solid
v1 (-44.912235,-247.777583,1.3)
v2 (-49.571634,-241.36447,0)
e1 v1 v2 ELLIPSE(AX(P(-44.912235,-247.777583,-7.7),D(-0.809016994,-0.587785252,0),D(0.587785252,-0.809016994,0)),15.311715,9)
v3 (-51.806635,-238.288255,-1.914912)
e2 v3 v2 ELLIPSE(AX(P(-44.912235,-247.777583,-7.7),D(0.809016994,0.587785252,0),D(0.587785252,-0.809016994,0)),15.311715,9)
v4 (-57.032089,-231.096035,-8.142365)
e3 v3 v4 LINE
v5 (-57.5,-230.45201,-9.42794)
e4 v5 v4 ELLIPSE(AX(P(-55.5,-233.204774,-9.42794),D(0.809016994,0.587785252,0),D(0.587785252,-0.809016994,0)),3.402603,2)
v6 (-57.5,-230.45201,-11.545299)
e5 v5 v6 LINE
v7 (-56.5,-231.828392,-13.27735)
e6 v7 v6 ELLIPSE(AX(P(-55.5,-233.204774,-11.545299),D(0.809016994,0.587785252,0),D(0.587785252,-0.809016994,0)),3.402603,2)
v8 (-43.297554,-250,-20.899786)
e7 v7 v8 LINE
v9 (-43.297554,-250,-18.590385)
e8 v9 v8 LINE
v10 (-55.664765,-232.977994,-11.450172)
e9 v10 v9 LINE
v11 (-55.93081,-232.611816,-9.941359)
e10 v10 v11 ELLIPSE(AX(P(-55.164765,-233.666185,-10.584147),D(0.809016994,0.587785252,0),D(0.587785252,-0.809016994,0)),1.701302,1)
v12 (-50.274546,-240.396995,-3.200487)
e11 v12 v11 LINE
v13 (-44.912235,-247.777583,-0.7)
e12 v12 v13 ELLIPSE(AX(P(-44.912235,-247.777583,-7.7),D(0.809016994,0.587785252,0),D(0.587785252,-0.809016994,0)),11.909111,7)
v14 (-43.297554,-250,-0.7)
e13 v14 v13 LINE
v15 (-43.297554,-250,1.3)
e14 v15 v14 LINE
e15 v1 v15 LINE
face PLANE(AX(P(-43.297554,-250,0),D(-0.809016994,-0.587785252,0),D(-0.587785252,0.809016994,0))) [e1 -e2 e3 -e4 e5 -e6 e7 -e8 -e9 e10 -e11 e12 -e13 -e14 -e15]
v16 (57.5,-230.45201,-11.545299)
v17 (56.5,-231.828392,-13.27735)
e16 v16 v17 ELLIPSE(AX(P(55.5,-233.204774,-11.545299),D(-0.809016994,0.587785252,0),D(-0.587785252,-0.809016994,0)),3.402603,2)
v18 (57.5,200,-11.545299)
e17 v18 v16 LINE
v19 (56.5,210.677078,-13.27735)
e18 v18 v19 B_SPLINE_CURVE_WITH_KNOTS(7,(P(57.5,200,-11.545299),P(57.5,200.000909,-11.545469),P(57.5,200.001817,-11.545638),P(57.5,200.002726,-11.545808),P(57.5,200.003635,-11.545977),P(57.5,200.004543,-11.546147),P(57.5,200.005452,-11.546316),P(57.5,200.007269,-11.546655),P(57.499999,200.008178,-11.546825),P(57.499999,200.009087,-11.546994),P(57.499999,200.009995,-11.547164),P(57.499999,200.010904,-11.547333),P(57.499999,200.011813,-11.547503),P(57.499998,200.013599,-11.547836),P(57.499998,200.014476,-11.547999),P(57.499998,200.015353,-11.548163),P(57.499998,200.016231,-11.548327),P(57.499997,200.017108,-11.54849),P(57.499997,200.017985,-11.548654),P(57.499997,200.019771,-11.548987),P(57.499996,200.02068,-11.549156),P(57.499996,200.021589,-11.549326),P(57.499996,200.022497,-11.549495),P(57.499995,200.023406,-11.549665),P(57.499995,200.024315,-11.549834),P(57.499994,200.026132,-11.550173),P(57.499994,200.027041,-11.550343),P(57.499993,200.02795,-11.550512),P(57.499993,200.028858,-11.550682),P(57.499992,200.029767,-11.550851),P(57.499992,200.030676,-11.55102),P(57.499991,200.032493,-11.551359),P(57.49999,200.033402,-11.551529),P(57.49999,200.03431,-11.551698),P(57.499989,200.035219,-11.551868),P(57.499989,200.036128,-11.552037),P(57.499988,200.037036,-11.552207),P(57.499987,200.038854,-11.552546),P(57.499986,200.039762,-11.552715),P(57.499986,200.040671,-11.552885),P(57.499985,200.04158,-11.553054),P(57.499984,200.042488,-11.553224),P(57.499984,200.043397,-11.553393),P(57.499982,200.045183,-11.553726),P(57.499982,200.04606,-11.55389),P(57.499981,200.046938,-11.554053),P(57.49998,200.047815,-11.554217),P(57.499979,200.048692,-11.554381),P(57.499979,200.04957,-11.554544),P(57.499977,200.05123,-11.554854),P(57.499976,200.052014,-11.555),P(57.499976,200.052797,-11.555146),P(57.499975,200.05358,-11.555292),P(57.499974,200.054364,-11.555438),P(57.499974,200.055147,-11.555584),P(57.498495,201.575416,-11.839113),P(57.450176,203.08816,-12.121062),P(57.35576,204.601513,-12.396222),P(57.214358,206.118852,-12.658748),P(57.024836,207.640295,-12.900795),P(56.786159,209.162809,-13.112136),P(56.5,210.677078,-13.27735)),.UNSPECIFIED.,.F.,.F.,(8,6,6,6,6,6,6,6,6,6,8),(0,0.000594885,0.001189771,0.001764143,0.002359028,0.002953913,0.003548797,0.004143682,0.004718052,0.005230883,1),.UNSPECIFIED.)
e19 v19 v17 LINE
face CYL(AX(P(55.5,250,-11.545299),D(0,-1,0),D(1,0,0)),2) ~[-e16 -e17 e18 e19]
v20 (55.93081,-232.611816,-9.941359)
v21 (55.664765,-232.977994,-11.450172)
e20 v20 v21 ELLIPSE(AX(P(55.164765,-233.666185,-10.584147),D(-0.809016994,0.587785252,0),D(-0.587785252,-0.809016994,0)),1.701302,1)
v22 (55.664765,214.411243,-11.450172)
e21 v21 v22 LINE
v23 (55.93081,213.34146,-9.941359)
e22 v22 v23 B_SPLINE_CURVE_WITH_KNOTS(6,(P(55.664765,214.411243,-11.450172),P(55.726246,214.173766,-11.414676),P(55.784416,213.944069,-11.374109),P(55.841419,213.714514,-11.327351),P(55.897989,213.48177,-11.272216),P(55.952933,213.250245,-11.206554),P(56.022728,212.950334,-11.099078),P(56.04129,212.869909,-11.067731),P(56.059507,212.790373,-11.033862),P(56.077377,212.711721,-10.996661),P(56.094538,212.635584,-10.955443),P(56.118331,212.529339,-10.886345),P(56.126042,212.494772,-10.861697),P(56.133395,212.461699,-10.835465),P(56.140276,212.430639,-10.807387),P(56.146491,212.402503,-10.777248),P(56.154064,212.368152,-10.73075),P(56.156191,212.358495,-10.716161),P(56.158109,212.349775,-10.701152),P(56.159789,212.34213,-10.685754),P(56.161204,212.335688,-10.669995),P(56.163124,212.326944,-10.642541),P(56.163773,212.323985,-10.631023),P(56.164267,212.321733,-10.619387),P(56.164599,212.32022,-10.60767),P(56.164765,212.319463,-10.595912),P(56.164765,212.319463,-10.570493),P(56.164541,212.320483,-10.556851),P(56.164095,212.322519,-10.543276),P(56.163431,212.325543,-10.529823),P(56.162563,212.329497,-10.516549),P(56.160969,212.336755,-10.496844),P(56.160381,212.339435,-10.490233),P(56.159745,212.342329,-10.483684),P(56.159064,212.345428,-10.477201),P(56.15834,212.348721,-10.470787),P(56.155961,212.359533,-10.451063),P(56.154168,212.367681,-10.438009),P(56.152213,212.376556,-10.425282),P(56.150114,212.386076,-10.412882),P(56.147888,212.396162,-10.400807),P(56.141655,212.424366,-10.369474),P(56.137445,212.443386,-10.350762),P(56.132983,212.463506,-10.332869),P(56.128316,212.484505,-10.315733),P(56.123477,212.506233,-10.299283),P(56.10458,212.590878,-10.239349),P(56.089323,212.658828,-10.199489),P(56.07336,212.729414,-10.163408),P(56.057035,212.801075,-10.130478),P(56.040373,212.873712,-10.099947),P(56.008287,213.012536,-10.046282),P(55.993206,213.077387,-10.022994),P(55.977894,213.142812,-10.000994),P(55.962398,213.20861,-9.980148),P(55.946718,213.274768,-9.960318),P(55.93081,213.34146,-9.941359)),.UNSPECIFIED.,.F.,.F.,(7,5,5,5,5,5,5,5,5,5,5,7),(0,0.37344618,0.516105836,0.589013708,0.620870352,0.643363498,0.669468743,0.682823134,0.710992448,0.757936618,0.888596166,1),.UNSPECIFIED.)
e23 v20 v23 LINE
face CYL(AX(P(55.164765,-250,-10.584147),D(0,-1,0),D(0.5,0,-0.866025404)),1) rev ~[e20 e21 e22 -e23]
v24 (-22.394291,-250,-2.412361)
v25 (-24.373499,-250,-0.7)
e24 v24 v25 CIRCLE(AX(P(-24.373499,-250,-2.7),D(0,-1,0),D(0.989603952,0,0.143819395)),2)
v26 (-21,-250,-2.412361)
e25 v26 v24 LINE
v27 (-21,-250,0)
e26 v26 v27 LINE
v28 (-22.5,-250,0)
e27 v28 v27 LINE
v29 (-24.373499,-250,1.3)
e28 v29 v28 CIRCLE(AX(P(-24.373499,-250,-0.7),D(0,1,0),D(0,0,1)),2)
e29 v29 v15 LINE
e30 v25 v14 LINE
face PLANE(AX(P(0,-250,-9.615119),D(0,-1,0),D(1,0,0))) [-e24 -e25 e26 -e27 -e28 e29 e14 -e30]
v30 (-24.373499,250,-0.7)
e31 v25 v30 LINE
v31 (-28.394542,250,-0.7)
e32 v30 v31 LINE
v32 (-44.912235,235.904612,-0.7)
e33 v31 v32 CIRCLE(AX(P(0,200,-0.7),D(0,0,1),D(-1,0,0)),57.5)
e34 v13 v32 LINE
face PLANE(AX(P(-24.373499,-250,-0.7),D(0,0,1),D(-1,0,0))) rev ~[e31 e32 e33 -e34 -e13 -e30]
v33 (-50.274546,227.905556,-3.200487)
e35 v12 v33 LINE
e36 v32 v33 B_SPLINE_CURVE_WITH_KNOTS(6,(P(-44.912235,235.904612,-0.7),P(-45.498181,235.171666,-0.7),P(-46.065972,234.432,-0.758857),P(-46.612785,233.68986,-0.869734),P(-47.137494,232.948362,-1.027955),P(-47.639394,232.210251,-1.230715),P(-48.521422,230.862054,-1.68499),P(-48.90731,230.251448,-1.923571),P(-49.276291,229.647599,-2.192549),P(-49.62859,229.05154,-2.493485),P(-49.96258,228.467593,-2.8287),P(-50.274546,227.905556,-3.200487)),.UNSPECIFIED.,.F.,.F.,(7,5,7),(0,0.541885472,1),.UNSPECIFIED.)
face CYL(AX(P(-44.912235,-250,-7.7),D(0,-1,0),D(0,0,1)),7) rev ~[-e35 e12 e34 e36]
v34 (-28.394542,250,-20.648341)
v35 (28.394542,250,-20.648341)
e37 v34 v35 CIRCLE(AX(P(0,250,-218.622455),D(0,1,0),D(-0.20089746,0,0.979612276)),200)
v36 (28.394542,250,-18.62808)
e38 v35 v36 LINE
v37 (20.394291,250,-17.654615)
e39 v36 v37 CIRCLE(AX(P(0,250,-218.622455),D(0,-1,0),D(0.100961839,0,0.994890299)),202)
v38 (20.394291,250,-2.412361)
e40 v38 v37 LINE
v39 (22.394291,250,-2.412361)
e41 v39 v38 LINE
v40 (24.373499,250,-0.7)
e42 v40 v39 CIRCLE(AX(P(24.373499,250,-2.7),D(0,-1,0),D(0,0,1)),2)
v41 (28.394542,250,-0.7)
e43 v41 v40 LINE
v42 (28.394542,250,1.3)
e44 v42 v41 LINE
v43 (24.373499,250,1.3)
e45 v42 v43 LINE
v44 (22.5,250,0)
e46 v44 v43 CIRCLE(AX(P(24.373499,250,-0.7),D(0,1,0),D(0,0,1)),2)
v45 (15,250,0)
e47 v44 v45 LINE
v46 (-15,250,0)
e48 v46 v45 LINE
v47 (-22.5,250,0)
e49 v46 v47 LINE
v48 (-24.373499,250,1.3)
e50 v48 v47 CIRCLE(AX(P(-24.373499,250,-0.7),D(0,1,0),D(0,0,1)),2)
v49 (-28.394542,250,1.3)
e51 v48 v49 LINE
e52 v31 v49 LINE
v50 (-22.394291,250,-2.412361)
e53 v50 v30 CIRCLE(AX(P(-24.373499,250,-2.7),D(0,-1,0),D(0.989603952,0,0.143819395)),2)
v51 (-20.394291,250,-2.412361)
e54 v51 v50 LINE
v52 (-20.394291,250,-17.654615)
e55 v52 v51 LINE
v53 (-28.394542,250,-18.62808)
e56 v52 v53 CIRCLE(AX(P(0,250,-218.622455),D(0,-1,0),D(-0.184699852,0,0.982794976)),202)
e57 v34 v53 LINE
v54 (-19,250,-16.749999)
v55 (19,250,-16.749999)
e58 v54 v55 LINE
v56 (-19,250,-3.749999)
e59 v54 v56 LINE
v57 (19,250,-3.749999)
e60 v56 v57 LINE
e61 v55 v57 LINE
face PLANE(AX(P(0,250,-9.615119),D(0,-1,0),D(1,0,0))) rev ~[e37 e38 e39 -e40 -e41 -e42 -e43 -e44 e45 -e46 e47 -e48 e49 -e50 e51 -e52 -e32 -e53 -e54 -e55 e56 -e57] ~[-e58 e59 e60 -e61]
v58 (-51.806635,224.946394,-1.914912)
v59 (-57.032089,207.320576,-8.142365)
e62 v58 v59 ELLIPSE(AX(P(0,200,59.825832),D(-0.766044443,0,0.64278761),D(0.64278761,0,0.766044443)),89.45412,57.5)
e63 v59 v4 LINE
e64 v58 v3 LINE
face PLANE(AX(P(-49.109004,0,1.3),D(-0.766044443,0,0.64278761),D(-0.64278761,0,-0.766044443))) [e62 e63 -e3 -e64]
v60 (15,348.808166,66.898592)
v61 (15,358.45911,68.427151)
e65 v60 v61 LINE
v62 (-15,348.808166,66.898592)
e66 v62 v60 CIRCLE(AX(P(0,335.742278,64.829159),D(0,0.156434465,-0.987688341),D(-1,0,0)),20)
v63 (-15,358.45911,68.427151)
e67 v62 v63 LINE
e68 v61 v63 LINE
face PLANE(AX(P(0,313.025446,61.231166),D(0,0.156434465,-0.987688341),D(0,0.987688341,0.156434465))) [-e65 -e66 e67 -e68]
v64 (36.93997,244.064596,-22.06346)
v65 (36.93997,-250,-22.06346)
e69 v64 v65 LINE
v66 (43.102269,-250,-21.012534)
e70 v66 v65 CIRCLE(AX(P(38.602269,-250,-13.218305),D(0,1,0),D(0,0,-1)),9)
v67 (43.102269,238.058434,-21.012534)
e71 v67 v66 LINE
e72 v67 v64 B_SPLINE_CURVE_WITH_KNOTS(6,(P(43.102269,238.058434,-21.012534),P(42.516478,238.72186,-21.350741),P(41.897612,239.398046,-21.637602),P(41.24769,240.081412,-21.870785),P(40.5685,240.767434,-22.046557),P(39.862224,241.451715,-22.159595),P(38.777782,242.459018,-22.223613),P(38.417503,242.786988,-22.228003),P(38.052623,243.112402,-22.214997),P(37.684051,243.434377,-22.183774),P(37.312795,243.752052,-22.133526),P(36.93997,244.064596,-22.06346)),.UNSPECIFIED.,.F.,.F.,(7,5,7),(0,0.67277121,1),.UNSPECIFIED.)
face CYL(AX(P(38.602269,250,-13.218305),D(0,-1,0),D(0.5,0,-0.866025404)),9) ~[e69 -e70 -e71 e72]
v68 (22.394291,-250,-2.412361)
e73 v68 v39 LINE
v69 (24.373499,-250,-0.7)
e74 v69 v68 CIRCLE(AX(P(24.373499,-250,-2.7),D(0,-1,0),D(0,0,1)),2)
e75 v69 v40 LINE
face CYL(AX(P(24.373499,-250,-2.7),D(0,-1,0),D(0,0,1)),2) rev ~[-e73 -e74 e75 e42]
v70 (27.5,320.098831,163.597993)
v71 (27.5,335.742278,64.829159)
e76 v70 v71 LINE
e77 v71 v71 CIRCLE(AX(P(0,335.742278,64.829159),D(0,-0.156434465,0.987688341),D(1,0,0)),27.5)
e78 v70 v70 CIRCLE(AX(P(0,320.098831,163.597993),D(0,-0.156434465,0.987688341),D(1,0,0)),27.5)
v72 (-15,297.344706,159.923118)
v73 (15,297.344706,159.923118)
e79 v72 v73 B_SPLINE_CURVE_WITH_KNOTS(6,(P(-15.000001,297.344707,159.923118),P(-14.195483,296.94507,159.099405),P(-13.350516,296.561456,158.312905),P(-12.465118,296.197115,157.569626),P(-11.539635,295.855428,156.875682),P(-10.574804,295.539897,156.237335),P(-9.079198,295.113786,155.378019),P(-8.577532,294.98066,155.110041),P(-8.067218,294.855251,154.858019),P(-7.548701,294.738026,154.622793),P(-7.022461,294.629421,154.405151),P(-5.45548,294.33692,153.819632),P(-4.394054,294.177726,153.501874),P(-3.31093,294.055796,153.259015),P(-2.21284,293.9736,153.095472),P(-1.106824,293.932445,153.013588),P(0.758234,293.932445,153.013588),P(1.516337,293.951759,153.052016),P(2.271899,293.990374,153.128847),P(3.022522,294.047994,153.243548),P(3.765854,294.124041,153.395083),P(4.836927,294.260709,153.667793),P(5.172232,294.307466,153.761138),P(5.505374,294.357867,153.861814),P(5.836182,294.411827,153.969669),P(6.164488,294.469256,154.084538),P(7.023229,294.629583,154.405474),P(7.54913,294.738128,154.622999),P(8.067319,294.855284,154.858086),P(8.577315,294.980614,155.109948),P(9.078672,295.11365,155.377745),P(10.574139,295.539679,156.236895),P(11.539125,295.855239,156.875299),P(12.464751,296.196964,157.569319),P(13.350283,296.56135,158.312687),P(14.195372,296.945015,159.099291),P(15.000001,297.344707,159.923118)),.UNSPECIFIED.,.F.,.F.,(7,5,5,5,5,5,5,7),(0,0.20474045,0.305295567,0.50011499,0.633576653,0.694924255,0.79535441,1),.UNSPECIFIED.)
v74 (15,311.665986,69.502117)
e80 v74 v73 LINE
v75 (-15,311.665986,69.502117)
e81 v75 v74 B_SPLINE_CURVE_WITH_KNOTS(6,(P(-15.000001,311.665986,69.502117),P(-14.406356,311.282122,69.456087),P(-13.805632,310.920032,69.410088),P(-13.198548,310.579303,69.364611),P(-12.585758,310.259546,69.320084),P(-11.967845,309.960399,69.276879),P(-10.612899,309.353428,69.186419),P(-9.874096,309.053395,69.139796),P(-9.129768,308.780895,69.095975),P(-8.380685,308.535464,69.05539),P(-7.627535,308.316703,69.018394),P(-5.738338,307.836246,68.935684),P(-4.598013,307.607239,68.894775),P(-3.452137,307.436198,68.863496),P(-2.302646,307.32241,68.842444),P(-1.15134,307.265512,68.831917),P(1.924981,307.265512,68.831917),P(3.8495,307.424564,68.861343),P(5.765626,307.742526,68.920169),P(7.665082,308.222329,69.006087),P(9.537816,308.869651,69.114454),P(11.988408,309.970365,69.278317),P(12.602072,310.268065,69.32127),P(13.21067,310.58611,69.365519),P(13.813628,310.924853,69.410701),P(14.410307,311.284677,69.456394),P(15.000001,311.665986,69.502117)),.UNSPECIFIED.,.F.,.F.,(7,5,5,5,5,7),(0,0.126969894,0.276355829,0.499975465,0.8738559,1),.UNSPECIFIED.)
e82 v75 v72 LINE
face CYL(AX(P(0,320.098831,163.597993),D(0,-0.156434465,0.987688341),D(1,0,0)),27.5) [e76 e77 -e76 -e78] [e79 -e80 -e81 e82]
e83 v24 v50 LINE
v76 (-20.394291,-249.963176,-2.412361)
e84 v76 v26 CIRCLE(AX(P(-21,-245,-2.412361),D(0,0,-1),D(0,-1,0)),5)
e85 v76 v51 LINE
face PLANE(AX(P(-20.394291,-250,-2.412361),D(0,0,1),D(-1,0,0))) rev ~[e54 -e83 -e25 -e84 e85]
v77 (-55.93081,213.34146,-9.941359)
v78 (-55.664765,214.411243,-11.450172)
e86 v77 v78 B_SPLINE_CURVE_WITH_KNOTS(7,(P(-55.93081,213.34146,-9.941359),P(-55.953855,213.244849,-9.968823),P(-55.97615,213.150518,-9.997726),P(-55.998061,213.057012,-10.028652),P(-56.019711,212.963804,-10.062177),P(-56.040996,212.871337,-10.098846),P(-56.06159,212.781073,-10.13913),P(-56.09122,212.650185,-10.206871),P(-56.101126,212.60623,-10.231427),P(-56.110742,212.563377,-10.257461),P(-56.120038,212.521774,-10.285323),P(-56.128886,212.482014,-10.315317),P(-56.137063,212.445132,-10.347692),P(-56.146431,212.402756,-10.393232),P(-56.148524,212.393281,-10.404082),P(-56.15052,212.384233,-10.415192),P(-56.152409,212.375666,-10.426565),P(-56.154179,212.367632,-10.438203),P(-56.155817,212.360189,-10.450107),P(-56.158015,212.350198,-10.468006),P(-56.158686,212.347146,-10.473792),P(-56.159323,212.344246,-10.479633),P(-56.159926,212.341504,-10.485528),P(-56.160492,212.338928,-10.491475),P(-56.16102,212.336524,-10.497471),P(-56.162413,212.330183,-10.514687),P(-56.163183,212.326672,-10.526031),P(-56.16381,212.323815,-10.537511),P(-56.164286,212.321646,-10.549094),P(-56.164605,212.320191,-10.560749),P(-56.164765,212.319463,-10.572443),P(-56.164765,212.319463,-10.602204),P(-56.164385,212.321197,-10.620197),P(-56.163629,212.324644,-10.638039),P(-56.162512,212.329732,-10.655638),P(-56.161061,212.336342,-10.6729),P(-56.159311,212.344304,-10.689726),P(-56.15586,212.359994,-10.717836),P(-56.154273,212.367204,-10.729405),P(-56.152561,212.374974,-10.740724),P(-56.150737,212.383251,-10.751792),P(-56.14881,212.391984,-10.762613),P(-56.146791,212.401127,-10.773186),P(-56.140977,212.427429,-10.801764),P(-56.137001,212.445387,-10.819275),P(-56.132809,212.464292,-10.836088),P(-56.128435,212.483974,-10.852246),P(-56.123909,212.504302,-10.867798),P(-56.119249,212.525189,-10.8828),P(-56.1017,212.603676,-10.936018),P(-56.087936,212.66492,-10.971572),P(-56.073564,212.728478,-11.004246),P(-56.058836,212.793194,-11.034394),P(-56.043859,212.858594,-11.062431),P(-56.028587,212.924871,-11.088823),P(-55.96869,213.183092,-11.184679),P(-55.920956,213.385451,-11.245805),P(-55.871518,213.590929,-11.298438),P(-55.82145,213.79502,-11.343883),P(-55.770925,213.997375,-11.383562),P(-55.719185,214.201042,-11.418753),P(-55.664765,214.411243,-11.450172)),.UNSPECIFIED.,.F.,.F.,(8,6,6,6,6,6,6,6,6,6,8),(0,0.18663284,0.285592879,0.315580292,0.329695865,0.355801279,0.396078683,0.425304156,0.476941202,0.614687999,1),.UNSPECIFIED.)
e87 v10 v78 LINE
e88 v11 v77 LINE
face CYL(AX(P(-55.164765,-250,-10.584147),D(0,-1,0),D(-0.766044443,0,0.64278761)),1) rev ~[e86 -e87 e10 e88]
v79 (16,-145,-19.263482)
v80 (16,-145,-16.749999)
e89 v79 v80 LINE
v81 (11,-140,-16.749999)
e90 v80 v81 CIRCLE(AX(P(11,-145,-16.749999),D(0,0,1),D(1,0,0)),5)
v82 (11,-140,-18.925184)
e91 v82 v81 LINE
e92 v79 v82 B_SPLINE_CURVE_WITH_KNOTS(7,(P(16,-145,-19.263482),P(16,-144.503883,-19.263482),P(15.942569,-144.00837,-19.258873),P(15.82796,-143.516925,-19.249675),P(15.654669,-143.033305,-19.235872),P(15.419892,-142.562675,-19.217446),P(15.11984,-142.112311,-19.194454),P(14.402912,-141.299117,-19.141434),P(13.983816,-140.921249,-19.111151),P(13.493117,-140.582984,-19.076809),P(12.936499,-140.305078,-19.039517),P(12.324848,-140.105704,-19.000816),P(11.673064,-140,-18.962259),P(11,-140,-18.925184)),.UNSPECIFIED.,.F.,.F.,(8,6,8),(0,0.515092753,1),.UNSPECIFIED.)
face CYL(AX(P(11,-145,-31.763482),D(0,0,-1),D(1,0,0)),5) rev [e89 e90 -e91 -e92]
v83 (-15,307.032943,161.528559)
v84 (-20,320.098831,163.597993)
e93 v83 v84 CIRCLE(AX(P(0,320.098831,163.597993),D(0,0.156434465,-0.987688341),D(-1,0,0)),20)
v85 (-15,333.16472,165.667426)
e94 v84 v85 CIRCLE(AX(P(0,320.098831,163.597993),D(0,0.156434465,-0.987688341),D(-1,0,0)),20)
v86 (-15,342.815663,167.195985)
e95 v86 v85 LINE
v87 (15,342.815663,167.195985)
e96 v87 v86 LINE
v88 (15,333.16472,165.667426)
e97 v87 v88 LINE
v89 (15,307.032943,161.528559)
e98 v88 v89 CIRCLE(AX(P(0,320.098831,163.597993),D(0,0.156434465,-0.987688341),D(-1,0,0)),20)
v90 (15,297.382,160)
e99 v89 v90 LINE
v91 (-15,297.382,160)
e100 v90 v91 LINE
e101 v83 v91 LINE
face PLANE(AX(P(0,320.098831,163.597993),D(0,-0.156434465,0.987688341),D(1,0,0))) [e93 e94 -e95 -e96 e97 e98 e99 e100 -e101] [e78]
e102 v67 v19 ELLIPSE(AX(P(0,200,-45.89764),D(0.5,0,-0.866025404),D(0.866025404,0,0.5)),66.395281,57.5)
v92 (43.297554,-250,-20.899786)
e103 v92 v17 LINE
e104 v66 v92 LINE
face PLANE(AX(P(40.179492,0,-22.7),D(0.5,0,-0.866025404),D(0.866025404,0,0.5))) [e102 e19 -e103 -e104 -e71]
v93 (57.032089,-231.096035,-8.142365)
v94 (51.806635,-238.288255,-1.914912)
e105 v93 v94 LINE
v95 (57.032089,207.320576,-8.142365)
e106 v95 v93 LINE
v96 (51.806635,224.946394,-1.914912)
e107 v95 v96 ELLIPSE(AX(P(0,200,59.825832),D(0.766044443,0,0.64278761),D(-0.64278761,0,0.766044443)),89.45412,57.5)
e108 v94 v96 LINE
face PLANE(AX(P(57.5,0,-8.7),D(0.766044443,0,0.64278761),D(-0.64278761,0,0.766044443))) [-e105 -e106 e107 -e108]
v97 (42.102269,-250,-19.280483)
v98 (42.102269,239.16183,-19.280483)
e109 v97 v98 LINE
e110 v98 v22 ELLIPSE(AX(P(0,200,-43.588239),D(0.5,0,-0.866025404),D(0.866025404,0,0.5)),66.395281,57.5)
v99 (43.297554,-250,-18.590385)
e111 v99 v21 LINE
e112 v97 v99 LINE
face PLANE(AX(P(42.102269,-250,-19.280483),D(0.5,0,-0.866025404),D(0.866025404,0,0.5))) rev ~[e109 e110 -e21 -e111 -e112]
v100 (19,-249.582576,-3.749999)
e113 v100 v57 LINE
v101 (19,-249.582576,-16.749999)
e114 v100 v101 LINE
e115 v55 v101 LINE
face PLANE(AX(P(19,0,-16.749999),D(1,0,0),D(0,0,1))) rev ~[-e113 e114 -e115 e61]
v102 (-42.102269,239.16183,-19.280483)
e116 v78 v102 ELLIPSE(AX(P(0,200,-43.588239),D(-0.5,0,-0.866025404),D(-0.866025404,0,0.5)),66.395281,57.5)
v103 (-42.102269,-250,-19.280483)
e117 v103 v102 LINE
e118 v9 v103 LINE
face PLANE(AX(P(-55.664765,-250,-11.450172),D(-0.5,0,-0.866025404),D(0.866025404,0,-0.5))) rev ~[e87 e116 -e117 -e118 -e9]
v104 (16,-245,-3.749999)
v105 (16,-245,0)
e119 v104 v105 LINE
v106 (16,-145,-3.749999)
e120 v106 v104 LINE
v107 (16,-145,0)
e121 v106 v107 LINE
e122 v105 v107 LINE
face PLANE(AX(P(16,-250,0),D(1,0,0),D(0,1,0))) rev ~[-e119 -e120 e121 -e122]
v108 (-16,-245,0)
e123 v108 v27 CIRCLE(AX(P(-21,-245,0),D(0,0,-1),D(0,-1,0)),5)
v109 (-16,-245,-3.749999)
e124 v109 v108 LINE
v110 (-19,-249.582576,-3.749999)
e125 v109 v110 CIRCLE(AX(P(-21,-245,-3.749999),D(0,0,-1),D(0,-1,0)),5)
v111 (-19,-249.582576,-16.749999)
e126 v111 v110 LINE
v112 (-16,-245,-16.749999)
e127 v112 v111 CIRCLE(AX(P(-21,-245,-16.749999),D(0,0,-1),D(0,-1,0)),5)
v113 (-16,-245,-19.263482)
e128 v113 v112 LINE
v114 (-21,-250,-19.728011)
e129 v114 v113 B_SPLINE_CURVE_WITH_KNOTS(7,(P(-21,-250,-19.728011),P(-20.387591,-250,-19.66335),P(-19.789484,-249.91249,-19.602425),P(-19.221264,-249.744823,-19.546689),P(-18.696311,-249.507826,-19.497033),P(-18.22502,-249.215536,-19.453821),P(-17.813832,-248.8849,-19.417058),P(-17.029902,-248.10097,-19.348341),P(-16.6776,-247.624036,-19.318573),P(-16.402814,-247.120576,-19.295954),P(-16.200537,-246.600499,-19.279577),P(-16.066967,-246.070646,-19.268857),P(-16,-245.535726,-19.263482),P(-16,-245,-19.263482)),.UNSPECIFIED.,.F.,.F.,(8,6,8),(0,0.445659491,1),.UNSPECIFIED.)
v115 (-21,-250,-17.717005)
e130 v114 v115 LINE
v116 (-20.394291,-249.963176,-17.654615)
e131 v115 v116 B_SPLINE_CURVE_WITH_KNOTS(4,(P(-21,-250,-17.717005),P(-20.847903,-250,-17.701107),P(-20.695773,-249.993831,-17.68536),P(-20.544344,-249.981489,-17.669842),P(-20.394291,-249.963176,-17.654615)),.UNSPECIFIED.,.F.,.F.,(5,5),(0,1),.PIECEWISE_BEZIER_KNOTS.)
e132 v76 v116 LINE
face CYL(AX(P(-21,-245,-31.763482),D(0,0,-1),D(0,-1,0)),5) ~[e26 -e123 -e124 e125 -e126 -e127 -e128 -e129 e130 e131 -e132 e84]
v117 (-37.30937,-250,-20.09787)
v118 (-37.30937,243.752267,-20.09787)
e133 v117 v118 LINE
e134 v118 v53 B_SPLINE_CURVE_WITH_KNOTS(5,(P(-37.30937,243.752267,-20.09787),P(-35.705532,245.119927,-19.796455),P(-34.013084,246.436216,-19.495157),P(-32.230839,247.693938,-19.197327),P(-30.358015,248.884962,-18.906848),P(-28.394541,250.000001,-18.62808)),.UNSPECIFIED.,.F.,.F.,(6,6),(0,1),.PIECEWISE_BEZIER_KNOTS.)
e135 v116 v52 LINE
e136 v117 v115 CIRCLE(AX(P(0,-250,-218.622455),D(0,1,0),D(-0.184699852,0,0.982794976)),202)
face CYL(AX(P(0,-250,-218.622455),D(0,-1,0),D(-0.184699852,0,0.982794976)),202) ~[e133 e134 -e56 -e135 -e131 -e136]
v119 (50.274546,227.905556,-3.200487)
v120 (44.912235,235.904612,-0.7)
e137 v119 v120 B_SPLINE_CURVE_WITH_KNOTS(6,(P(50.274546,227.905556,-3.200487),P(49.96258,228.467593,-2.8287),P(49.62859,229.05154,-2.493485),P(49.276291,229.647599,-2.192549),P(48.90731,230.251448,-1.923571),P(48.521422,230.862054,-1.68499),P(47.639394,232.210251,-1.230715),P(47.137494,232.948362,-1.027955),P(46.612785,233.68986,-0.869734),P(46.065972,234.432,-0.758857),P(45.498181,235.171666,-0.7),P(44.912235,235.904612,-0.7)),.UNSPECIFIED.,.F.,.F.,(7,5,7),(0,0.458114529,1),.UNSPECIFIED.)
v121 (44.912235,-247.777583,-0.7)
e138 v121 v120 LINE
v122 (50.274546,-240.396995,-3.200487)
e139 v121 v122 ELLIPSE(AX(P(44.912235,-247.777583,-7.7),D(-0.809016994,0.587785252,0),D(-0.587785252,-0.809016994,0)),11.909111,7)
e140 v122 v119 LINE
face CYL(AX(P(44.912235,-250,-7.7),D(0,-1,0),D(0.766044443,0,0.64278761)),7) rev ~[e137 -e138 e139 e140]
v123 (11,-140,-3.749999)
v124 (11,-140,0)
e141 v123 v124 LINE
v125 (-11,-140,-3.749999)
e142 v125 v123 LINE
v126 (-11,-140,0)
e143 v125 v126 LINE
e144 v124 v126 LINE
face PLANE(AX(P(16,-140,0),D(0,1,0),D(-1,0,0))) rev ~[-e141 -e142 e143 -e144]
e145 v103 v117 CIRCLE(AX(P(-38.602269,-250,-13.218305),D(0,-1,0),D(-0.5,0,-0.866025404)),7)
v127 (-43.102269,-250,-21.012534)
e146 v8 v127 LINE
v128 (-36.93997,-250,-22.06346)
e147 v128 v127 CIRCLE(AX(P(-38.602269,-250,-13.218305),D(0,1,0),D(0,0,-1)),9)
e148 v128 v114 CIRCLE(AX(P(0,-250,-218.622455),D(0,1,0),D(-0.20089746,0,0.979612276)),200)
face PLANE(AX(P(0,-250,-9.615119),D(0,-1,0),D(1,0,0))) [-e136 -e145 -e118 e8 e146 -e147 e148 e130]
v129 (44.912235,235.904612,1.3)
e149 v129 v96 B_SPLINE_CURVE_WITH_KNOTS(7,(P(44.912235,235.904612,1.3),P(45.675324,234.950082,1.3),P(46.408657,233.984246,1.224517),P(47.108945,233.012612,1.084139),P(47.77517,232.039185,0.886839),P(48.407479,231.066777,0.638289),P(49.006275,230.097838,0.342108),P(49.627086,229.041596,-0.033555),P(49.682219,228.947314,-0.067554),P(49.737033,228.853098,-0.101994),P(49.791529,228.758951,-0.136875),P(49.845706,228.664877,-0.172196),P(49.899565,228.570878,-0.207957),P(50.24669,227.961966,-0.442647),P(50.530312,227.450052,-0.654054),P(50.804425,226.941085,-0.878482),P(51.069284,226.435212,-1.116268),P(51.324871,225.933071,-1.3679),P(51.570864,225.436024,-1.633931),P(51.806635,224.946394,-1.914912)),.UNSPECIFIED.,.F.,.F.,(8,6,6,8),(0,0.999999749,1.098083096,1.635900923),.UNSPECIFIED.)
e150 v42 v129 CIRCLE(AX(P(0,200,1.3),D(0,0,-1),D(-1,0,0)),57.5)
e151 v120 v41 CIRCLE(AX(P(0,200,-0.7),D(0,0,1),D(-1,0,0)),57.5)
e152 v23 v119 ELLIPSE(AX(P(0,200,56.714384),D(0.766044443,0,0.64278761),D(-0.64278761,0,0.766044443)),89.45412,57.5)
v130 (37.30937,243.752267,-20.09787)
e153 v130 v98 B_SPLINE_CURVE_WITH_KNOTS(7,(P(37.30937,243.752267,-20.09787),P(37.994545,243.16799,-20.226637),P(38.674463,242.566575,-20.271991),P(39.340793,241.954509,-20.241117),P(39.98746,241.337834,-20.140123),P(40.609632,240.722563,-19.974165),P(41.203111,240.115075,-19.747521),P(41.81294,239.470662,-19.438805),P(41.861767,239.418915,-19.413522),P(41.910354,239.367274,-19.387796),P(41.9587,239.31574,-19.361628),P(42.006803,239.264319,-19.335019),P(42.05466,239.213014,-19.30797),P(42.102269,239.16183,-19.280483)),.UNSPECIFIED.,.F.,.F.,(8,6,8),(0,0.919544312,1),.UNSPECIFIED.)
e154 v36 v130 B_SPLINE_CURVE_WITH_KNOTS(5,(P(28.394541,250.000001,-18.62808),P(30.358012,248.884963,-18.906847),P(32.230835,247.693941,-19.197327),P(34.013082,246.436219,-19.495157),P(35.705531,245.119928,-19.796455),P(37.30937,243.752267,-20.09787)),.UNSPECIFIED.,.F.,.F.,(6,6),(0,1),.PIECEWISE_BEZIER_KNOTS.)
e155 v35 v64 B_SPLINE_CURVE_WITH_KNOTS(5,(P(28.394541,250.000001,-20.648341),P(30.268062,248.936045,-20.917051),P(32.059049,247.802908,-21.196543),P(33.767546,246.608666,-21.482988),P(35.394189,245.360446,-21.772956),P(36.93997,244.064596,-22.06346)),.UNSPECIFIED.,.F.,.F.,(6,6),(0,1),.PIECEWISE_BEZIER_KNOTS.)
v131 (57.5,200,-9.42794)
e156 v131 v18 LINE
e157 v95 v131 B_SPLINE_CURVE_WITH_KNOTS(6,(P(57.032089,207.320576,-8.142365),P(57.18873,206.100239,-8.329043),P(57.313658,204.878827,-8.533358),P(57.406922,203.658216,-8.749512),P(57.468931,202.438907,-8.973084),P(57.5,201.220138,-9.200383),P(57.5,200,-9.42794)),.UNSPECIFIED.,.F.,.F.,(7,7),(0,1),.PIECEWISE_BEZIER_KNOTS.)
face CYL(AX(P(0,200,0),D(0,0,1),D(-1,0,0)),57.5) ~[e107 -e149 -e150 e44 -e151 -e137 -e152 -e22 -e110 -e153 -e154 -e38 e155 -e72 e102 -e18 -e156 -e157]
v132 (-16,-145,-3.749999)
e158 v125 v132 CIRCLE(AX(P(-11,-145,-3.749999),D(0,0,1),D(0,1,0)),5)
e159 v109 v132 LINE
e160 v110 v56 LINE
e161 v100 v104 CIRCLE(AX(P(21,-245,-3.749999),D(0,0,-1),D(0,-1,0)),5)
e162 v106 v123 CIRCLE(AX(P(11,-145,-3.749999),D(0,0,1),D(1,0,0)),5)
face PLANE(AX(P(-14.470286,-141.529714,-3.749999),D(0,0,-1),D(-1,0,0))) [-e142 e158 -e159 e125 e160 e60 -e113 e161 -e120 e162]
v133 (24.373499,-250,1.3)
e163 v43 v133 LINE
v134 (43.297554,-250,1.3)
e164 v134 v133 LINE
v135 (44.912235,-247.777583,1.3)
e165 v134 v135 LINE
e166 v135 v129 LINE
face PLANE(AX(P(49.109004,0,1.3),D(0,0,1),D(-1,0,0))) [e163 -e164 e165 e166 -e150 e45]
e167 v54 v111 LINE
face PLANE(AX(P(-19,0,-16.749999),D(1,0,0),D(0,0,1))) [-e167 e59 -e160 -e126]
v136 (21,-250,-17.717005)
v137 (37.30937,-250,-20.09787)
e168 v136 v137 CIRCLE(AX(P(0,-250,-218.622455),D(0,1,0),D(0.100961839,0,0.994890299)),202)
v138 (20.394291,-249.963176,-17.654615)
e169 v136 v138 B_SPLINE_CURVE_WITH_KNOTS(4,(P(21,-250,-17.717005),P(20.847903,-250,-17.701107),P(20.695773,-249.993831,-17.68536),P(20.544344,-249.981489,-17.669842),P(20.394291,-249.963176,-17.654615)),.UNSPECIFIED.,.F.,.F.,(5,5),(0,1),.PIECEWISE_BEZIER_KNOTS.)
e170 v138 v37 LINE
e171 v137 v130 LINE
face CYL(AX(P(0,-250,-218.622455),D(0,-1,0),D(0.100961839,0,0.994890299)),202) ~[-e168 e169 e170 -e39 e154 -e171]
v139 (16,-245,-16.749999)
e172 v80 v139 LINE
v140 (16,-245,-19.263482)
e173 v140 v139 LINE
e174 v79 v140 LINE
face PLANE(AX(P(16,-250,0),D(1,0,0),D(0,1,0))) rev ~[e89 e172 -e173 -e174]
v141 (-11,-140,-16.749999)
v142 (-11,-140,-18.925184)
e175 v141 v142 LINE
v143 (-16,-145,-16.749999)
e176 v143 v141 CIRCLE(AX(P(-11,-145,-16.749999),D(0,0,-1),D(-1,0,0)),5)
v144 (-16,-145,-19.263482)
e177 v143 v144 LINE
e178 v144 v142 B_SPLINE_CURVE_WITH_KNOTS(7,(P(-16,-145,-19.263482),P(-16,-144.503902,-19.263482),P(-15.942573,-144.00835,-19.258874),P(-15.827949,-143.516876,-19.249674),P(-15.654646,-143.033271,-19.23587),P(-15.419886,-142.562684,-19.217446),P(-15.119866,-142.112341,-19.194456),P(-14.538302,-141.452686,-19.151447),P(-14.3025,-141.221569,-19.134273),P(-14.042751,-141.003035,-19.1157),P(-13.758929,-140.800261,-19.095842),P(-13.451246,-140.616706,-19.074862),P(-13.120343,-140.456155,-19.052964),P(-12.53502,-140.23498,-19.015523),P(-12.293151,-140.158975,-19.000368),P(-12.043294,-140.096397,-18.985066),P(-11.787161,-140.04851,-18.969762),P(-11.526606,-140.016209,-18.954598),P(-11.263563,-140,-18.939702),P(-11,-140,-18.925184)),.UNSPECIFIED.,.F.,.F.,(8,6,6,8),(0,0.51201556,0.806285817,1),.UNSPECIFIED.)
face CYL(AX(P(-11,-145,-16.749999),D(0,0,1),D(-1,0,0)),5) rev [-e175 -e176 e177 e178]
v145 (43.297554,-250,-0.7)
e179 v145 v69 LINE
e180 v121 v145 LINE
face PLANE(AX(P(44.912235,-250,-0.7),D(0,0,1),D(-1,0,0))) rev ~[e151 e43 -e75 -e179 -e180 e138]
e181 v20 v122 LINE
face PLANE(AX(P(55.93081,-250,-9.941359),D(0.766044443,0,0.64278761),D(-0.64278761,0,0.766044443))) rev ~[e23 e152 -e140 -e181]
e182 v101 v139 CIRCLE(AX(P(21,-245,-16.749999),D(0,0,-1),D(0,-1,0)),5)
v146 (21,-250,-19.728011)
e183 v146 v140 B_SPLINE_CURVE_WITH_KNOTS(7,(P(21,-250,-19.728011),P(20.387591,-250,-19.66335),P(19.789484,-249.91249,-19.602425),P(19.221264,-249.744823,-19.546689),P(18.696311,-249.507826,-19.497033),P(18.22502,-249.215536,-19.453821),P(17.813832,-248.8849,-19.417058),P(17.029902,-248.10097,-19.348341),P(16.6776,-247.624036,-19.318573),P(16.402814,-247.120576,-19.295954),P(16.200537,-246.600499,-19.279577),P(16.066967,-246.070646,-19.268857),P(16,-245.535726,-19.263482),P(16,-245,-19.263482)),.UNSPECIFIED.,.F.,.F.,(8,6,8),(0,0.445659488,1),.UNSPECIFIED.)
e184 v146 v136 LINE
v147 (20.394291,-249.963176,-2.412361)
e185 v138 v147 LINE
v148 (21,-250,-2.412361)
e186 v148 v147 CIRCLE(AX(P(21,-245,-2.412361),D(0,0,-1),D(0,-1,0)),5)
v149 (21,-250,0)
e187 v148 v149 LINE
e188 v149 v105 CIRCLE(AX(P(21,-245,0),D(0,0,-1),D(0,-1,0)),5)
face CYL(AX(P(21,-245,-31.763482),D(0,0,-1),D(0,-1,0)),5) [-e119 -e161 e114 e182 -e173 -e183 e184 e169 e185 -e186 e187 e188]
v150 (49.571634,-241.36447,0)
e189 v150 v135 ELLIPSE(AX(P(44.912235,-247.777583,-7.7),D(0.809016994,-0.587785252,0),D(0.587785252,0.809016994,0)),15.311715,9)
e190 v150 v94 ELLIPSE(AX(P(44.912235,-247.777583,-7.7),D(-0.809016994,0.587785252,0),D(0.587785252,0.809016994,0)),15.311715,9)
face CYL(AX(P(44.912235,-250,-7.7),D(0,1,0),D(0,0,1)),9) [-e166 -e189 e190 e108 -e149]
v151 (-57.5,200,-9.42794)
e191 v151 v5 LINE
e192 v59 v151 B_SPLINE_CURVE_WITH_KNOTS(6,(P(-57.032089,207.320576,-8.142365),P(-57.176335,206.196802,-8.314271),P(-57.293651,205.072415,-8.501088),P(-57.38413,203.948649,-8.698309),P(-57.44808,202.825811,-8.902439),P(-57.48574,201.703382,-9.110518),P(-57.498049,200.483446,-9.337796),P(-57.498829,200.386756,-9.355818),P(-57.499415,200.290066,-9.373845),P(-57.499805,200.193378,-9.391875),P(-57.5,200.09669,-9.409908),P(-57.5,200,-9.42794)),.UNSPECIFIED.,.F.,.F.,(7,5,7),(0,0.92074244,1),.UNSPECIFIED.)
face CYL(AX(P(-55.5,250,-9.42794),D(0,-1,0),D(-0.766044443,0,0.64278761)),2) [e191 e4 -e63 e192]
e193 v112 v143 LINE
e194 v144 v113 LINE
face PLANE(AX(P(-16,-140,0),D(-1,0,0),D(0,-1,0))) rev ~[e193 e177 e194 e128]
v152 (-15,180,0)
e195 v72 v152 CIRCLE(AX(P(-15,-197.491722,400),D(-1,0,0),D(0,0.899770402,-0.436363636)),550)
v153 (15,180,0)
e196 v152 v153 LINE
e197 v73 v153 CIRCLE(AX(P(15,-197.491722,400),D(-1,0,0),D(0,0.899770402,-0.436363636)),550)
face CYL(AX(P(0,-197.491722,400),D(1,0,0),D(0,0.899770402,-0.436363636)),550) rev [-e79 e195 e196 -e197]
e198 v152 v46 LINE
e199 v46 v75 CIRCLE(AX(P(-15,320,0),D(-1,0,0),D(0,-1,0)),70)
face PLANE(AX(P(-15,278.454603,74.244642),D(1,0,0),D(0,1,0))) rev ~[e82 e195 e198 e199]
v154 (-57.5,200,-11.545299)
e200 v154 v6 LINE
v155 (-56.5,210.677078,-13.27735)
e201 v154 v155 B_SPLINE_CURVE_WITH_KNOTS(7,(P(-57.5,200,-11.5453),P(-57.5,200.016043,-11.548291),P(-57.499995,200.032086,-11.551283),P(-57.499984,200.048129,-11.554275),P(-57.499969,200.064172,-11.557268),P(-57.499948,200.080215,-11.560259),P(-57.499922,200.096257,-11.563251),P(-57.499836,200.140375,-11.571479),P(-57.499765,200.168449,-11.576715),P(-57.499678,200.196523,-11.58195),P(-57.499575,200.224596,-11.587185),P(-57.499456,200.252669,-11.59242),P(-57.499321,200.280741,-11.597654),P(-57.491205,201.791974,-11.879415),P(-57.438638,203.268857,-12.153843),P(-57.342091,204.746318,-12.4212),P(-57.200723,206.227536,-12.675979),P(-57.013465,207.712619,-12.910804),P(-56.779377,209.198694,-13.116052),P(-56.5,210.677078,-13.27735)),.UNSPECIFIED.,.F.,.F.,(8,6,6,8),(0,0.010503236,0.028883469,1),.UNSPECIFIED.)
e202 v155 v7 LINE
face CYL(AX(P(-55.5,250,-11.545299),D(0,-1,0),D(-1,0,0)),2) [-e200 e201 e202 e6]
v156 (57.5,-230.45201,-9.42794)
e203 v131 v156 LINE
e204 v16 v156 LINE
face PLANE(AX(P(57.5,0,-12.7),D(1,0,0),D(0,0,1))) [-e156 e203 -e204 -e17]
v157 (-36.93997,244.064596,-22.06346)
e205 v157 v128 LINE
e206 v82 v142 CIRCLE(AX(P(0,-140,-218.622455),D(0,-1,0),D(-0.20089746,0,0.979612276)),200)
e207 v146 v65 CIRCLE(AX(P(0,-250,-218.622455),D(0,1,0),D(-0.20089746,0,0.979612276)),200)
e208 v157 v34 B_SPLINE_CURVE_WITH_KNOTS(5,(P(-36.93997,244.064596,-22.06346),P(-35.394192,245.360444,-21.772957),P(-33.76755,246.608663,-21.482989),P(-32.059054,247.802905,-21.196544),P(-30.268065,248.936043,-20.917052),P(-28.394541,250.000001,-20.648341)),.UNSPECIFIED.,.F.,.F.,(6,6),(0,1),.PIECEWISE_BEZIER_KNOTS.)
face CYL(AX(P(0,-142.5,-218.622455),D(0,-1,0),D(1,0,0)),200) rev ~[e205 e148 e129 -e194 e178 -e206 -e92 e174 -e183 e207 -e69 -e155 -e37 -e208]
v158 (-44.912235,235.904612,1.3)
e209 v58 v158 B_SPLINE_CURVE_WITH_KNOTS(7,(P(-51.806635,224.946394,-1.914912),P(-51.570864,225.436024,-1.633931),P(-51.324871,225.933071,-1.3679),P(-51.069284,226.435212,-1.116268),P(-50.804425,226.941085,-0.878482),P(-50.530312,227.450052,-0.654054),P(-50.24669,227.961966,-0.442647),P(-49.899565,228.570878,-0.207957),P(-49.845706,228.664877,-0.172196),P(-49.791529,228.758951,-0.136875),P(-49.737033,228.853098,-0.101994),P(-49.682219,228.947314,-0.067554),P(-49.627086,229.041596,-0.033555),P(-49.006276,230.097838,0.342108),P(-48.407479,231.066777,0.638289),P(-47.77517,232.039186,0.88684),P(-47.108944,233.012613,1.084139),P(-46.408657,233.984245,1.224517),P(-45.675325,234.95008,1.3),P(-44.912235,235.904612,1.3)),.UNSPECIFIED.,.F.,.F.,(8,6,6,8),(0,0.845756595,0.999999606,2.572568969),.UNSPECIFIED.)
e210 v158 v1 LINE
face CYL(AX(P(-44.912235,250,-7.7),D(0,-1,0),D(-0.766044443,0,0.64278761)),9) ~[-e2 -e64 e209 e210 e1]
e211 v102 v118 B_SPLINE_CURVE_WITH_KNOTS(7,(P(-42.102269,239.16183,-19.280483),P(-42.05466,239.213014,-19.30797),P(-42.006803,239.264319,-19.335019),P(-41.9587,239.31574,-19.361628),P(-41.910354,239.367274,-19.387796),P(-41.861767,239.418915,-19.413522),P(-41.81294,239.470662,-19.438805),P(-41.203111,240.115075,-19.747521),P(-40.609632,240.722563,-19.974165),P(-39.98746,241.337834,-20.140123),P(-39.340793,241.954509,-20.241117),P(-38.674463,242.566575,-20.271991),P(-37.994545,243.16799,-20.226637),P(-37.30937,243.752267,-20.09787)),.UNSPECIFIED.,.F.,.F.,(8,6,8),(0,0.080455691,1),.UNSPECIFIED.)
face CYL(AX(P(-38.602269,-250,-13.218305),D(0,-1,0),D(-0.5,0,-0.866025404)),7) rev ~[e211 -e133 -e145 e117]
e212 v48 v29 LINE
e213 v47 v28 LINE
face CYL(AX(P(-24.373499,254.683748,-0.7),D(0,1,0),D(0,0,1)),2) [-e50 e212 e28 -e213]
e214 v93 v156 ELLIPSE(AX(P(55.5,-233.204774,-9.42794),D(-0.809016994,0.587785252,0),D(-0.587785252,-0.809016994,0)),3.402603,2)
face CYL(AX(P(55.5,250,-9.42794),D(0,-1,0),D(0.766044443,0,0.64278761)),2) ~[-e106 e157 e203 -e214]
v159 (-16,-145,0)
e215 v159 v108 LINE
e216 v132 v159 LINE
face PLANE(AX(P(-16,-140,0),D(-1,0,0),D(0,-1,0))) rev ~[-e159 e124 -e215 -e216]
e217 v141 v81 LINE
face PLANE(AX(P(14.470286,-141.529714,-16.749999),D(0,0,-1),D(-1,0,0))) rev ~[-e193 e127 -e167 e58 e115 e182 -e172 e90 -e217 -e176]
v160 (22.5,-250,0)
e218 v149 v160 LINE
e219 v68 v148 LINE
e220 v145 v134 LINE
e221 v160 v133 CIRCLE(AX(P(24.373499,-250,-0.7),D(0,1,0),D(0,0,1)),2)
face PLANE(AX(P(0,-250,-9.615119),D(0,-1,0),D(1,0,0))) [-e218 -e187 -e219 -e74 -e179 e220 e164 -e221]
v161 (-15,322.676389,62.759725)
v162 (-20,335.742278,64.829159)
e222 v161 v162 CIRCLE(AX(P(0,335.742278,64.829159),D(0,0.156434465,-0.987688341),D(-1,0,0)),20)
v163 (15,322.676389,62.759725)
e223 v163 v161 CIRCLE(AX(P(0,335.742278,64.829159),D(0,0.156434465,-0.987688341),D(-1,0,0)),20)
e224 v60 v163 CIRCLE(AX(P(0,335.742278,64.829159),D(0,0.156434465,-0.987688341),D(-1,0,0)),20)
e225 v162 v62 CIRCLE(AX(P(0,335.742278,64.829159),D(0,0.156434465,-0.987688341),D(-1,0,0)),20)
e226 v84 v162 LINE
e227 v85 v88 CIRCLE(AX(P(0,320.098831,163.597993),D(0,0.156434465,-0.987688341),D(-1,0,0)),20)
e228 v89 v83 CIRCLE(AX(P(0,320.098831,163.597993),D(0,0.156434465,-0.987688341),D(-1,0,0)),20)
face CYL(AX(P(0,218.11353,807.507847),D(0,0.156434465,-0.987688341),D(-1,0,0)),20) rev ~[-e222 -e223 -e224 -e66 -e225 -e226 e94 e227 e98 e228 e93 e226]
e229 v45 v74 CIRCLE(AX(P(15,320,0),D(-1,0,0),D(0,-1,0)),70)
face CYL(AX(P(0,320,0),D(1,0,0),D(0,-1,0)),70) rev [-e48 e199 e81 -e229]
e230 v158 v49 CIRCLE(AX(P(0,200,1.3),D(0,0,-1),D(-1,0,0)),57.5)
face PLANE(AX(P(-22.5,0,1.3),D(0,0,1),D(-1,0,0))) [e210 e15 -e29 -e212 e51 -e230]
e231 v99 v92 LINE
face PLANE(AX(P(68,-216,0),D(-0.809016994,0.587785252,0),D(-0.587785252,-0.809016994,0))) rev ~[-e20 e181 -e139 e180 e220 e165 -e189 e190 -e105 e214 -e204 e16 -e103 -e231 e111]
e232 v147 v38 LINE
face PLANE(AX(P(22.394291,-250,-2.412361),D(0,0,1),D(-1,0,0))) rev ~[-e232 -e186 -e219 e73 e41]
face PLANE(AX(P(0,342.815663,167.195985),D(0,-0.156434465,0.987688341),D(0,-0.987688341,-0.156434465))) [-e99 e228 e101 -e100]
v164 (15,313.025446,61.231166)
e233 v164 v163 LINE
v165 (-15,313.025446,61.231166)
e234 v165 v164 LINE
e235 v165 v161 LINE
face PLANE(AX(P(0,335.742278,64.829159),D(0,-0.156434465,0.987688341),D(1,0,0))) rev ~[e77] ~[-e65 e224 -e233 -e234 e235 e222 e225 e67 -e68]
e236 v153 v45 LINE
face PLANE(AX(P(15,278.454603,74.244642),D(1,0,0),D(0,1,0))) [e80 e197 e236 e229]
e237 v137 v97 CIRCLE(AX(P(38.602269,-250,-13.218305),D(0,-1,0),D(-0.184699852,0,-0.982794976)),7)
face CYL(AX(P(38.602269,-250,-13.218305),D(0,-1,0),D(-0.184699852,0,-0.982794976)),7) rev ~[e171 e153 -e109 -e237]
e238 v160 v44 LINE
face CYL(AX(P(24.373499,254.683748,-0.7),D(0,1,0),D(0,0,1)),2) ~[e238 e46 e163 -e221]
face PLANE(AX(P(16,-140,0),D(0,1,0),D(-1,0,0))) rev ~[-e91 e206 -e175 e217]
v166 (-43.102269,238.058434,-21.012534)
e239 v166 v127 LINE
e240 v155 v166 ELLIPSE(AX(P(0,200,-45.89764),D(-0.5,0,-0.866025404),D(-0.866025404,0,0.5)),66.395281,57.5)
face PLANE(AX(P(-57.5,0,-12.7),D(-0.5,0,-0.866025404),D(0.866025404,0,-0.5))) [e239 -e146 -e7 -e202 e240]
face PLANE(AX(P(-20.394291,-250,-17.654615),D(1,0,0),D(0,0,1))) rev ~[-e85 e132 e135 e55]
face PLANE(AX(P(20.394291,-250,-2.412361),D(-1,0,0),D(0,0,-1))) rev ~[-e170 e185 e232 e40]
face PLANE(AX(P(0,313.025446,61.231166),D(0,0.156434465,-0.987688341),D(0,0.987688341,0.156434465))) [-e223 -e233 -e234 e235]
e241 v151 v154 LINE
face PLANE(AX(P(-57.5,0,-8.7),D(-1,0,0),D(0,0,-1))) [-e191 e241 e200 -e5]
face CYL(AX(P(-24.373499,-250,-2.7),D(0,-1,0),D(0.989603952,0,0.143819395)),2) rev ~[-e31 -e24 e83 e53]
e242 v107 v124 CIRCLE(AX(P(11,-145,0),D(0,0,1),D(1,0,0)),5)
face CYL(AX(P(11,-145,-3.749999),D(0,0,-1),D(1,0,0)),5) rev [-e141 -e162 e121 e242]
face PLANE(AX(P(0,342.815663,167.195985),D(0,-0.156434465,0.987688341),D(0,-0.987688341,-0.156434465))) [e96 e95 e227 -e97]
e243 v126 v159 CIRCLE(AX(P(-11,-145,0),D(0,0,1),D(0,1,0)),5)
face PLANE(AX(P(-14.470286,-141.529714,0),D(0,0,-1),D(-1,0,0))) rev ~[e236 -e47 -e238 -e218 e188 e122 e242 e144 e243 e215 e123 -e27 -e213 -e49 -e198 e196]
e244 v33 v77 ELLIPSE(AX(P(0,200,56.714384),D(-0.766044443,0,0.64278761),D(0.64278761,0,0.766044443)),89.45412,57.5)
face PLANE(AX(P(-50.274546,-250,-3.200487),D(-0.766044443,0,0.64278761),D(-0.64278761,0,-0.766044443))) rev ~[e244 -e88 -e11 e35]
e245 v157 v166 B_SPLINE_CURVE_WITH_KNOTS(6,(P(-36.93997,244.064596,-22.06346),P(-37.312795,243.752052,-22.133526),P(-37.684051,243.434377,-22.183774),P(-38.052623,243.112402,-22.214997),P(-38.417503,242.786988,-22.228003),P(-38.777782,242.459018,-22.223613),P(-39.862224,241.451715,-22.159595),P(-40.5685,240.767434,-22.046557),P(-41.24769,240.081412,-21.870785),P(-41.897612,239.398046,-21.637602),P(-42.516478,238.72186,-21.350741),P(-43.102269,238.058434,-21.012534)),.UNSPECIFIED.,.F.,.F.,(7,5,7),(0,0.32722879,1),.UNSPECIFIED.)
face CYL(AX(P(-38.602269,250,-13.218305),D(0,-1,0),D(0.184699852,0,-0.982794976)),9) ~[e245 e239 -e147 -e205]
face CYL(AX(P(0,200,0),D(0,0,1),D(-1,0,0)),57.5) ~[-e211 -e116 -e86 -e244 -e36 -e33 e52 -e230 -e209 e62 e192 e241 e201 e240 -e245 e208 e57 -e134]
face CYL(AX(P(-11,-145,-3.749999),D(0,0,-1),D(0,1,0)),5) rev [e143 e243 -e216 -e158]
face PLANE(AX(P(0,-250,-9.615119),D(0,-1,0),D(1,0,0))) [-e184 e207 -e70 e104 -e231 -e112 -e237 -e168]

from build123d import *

# Parameters (mm, degrees)
F1_DEPTH       = 250
F2_W           = 38
F2_H           = 13
F3_DEPTH       = 250
F4_T1_DEPTH    = 509.3674969976
F5_R           = 9
F6_R           = 2
F8_DEPTH       = 764
F8_DEPTH_BACK  = 500.001
F10_DEPTH      = 22.2193051812
F10_DEPTH_BACK = 1.301
F12_DEPTH      = 1.3010001
F12_DEPTH_BACK = 22.219305294
F13_T1_DEPTH   = 3.7499991487
F13_T6_DEPTH   = 15.0134832828
F13_S7_R       = 200
F13_T8_DEPTH   = 10
F13_T12_DEPTH  = 15.0134832828
F13_S13_R      = 200
F13_T14_DEPTH  = 10
F13_T15_DEPTH  = 28.7499991487
F13_T17_DEPTH  = 27.5134832828
F15_DEPTH      = 15
F16_R          = 27.5
F17_DEPTH      = 100
F19_D          = 40


# Not quite as in the source:
# - a fillet or chamfer that OpenCascade refuses, or shapes differently, is made with other operations: its cross-section is extruded or revolved along the edge and cut away or added
# - an extrude ends at something that could not be found from the text; its depth is read off the source's solid


with BuildPart() as f1:
    # F0 (on Front) → F1 (new body, symmetric)
    with BuildSketch(Plane.XZ):
        with BuildLine():
            Line((22.5, 0), (0, 0))
            Line((0, 0), (-22.5, 0))
            Line((-22.5, 0), (-22.5, 1.3))
            Line((-22.5, 1.3), (-49.1090036882, 1.3))
            Line((-49.1090036882, 1.3), (-57.5, -8.7))
            Line((-57.5, -8.7), (-57.5, -12.7))
            Line((-57.5, -12.7), (-40.1794919243, -22.7))
            ThreePointArc((-40.1794919243, -22.7), (0, -18.6224551416), (40.1794919243, -22.7))
            Line((40.1794919243, -22.7), (57.5, -12.7))
            Line((57.5, -12.7), (57.5, -8.7))
            Line((57.5, -8.7), (49.1090036882, 1.3))
            Line((49.1090036882, 1.3), (22.5, 1.3))
            Line((22.5, 1.3), (22.5, 0))
        make_face()
    extrude(amount=F1_DEPTH, both=True)

    # F2 (on Front) → F3 (cut, symmetric)
    with BuildSketch(Plane.XZ):
        with Locations((0, -10.2499991487)):
            Rectangle(F2_W, F2_H)
    extrude(amount=F3_DEPTH, both=True, mode=Mode.SUBTRACT)

    # F4: fillet of radius 2 on 2 edges, made by hand

    # F4_s2 → F4_t1 (cut)
    with BuildSketch(Plane.XZ.offset(-254.6837484988)):
        with BuildLine():
            ThreePointArc((24.3734993995, 1.3), (23.2333239744, 0.9431676725), (22.5, 0))
            Line((22.5, 0), (22.5, 1.3))
            Line((22.5, 1.3), (24.3734993995, 1.3))
        make_face()
        with BuildLine():
            ThreePointArc((-24.3734993995, 1.3), (-23.2333239744, 0.9431676725), (-22.5, 0))
            Line((-22.5, 0), (-22.5, 1.3))
            Line((-22.5, 1.3), (-24.3734993995, 1.3))
        make_face()
    extrude(amount=F4_T1_DEPTH, mode=Mode.SUBTRACT)

    # F5
    f5_edges = [f1.edges().sort_by_distance(p)[0] for p in [
        (-49.109004, 0, 1.3),
        (49.109004, 0, 1.3),
        (40.179492, 0, -22.7),
        (-40.179492, 0, -22.7),
    ]]
    fillet(f5_edges, radius=F5_R)

    # F6
    f6_edges = [f1.edges().sort_by_distance(p)[0] for p in [
        (-57.5, 0, -8.7),
        (-57.5, 0, -12.7),
        (57.5, 0, -8.7),
        (57.5, 0, -12.7),
    ]]
    fillet(f6_edges, radius=F6_R)

    # F7 (on face) → F8 (cut, two sides)
    with BuildSketch(Plane.XZ.offset(250)) as f8_sk:
        with BuildLine():
            ThreePointArc((-37.3093701274, -20.0978700124), (-28.8776819579, -18.697270423), (-20.3942914958, -17.6546147432))
            Line((-20.3942914958, -17.6546147432), (-20.3942914958, -2.4123612095))
            Line((-20.3942914958, -2.4123612095), (-22.3942914958, -2.4123612095))
            ThreePointArc((-22.3942914958, -2.4123612095), (-23.0649271969, -1.1875057717), (-24.3734993995, -0.7))
            Line((-24.3734993995, -0.7), (-44.9122347648, -0.7))
            ThreePointArc((-44.9122347648, -0.7), (-47.870562597, -1.3558454907), (-50.2745458667, -3.2004867322))
            Line((-50.2745458667, -3.2004867322), (-55.9308095341, -9.9413592785))
            ThreePointArc((-55.9308095341, -9.9413592785), (-56.149572844, -10.7577950659), (-55.664765091, -11.450172292))
            Line((-55.664765091, -11.450172292), (-42.1022690923, -19.2804830077))
            ThreePointArc((-42.1022690923, -19.2804830077), (-39.7790673433, -20.1186780608), (-37.3093701274, -20.0978700124))
        make_face()
        with BuildLine():
            Line((22.3942914958, -2.4123612095), (20.3942914958, -2.4123612095))
            Line((20.3942914958, -2.4123612095), (20.3942914958, -17.6546147432))
            ThreePointArc((20.3942914958, -17.6546147432), (28.8776819579, -18.697270423), (37.3093701274, -20.0978700124))
            ThreePointArc((37.3093701274, -20.0978700124), (39.7790673433, -20.1186780608), (42.1022690923, -19.2804830077))
            Line((42.1022690923, -19.2804830077), (55.664765091, -11.450172292))
            ThreePointArc((55.664765091, -11.450172292), (56.149572844, -10.7577950659), (55.9308095341, -9.9413592785))
            Line((55.9308095341, -9.9413592785), (50.2745458667, -3.2004867322))
            ThreePointArc((50.2745458667, -3.2004867322), (47.870562597, -1.3558454907), (44.9122347648, -0.7))
            Line((44.9122347648, -0.7), (24.3734993995, -0.7))
            ThreePointArc((24.3734993995, -0.7), (23.0649271969, -1.1875057717), (22.3942914958, -2.4123612095))
        make_face()
    extrude(amount=F8_DEPTH, mode=Mode.SUBTRACT)
    extrude(f8_sk.sketch, amount=-F8_DEPTH_BACK, mode=Mode.SUBTRACT)

    # F9 (on Top) → F10 (cut, two sides)
    with BuildSketch(Plane.XY) as f10_sk:
        with BuildLine():
            ThreePointArc((-57.5, 200), (0, 257.5), (57.5, 200))
            Line((57.5, 200), (57.5, 280))
            Line((57.5, 280), (-57.5, 280))
            Line((-57.5, 280), (-57.5, 200))
        make_face()
    extrude(amount=-F10_DEPTH, mode=Mode.SUBTRACT)
    extrude(f10_sk.sketch, amount=F10_DEPTH_BACK, mode=Mode.SUBTRACT)

    # F11 (on Top) → F12 (cut, two sides)
    with BuildSketch(Plane.XY) as f12_sk:
        Polygon((-43.2975540478, -250), (-68, -216), (-68, -346), (68, -346), (68, -216), (43.2975540478, -250), (16, -250), (16, -140), (-16, -140), (-16, -250), align=None)
    extrude(amount=F12_DEPTH, mode=Mode.SUBTRACT)
    extrude(f12_sk.sketch, amount=-F12_DEPTH_BACK, mode=Mode.SUBTRACT)

    # F13: fillet of radius 5 on 8 edges, made by hand

    # F13_s2 → F13_t1 (join)
    with BuildSketch(Plane.XY.offset(-3.7499991487)):
        with BuildLine():
            ThreePointArc((-11, -140), (-14.5355339059, -141.4644660941), (-16, -145))
            Line((-16, -145), (-16, -140))
            Line((-16, -140), (-11, -140))
        make_face()
        with BuildLine():
            ThreePointArc((16, -145), (14.5355339059, -141.4644660941), (11, -140))
            Line((11, -140), (16, -140))
            Line((16, -140), (16, -145))
        make_face()
    extrude(amount=F13_T1_DEPTH)


with BuildPart() as f13_tool4:
    # F13_s5 → F13_t6 (new body)
    with BuildSketch(Plane.XY.offset(-16.7499991487)):
        with BuildLine():
            ThreePointArc((-16, -145), (-14.5355339059, -141.4644660941), (-11, -140))
            Line((-11, -140), (-16, -140))
            Line((-16, -140), (-16, -145))
        make_face()
    extrude(amount=-F13_T6_DEPTH)

    # F13_s7 → F13_t8 (cut, symmetric)
    with BuildSketch(Plane.XZ.offset(142.5)):
        with Locations((0, -218.6224551416)):
            Circle(F13_S7_R)
    extrude(amount=F13_T8_DEPTH, both=True, mode=Mode.SUBTRACT)


with BuildPart() as f1_1:
    add(f1.part)

    # F13_t3: union F13_tool4
    add(f13_tool4.part)


with BuildPart() as f13_tool10:
    # F13_s11 → F13_t12 (new body)
    with BuildSketch(Plane.XY.offset(-31.7634824315)):
        with BuildLine():
            ThreePointArc((16, -145), (14.5355339059, -141.4644660941), (11, -140))
            Line((11, -140), (16, -140))
            Line((16, -140), (16, -145))
        make_face()
    extrude(amount=F13_T12_DEPTH)

    # F13_s13 → F13_t14 (cut, symmetric)
    with BuildSketch(Plane.XZ.offset(142.5)):
        with Locations((0, -218.6224551416)):
            Circle(F13_S13_R)
    extrude(amount=F13_T14_DEPTH, both=True, mode=Mode.SUBTRACT)


with BuildPart() as f1_2:
    add(f1_1.part)

    # F13_t9: union F13_tool10
    add(f13_tool10.part)

    # F13_s16 → F13_t15 (cut)
    with BuildSketch(Plane.XY.offset(-16.2499991487)):
        with BuildLine():
            ThreePointArc((21, -250), (17.4644660941, -248.5355339059), (16, -245))
            Line((16, -245), (16, -250))
            Line((16, -250), (21, -250))
        make_face()
        with BuildLine():
            ThreePointArc((-21, -250), (-17.4644660941, -248.5355339059), (-16, -245))
            Line((-16, -245), (-16, -250))
            Line((-16, -250), (-21, -250))
        make_face()
    extrude(amount=F13_T15_DEPTH, mode=Mode.SUBTRACT)

    # F13_s18 → F13_t17 (cut)
    with BuildSketch(Plane.XY.offset(-31.7634824315)):
        with BuildLine():
            ThreePointArc((21, -250), (17.4644660941, -248.5355339059), (16, -245))
            Line((16, -245), (16, -250))
            Line((16, -250), (21, -250))
        make_face()
        with BuildLine():
            ThreePointArc((-21, -250), (-17.4644660941, -248.5355339059), (-16, -245))
            Line((-16, -245), (-16, -250))
            Line((-16, -250), (-21, -250))
        make_face()
    extrude(amount=F13_T17_DEPTH, mode=Mode.SUBTRACT)

    # F14 (on Right) → F15 (join, symmetric)
    with BuildSketch(Plane.YZ):
        with BuildLine():
            ThreePointArc((297.3819995028, 160), (245.9666940414, 74.662277853), (180, 0))
            Line((180, 0), (250, 0))
            ThreePointArc((250, 0), (267.6550746197, 46.4758946867), (311.7145367693, 69.5079211245))
            Line((311.7145367693, 69.5079211245), (313.0254460068, 61.2311659405))
            Line((313.0254460068, 61.2311659405), (358.4591096742, 68.4271513323))
            Line((358.4591096742, 68.4271513323), (342.8156631702, 167.1959853919))
            Line((342.8156631702, 167.1959853919), (297.3819995028, 160))
        make_face()
    extrude(amount=F15_DEPTH, both=True)

    # F16 (on face) → F17 (join, through all)
    with BuildSketch(Plane(origin=(0, -17.4439040266, 110.1364754698), x_dir=(1, 0, 0), z_dir=(0, -0.156434465, 0.9876883406))):
        with Locations((0, 341.7502480182)):
            Circle(F16_R)
    extrude(amount=-F17_DEPTH)

    # F19 (through all)
    with Locations(Plane(origin=(0, -17.4439040266, 110.1364754698), x_dir=(1, 0, 0), z_dir=(0, -0.156434465, 0.9876883406))):
        with Locations((0, 341.7502480182)):
            Hole(F19_D / 2)


solid = f1_2.part
